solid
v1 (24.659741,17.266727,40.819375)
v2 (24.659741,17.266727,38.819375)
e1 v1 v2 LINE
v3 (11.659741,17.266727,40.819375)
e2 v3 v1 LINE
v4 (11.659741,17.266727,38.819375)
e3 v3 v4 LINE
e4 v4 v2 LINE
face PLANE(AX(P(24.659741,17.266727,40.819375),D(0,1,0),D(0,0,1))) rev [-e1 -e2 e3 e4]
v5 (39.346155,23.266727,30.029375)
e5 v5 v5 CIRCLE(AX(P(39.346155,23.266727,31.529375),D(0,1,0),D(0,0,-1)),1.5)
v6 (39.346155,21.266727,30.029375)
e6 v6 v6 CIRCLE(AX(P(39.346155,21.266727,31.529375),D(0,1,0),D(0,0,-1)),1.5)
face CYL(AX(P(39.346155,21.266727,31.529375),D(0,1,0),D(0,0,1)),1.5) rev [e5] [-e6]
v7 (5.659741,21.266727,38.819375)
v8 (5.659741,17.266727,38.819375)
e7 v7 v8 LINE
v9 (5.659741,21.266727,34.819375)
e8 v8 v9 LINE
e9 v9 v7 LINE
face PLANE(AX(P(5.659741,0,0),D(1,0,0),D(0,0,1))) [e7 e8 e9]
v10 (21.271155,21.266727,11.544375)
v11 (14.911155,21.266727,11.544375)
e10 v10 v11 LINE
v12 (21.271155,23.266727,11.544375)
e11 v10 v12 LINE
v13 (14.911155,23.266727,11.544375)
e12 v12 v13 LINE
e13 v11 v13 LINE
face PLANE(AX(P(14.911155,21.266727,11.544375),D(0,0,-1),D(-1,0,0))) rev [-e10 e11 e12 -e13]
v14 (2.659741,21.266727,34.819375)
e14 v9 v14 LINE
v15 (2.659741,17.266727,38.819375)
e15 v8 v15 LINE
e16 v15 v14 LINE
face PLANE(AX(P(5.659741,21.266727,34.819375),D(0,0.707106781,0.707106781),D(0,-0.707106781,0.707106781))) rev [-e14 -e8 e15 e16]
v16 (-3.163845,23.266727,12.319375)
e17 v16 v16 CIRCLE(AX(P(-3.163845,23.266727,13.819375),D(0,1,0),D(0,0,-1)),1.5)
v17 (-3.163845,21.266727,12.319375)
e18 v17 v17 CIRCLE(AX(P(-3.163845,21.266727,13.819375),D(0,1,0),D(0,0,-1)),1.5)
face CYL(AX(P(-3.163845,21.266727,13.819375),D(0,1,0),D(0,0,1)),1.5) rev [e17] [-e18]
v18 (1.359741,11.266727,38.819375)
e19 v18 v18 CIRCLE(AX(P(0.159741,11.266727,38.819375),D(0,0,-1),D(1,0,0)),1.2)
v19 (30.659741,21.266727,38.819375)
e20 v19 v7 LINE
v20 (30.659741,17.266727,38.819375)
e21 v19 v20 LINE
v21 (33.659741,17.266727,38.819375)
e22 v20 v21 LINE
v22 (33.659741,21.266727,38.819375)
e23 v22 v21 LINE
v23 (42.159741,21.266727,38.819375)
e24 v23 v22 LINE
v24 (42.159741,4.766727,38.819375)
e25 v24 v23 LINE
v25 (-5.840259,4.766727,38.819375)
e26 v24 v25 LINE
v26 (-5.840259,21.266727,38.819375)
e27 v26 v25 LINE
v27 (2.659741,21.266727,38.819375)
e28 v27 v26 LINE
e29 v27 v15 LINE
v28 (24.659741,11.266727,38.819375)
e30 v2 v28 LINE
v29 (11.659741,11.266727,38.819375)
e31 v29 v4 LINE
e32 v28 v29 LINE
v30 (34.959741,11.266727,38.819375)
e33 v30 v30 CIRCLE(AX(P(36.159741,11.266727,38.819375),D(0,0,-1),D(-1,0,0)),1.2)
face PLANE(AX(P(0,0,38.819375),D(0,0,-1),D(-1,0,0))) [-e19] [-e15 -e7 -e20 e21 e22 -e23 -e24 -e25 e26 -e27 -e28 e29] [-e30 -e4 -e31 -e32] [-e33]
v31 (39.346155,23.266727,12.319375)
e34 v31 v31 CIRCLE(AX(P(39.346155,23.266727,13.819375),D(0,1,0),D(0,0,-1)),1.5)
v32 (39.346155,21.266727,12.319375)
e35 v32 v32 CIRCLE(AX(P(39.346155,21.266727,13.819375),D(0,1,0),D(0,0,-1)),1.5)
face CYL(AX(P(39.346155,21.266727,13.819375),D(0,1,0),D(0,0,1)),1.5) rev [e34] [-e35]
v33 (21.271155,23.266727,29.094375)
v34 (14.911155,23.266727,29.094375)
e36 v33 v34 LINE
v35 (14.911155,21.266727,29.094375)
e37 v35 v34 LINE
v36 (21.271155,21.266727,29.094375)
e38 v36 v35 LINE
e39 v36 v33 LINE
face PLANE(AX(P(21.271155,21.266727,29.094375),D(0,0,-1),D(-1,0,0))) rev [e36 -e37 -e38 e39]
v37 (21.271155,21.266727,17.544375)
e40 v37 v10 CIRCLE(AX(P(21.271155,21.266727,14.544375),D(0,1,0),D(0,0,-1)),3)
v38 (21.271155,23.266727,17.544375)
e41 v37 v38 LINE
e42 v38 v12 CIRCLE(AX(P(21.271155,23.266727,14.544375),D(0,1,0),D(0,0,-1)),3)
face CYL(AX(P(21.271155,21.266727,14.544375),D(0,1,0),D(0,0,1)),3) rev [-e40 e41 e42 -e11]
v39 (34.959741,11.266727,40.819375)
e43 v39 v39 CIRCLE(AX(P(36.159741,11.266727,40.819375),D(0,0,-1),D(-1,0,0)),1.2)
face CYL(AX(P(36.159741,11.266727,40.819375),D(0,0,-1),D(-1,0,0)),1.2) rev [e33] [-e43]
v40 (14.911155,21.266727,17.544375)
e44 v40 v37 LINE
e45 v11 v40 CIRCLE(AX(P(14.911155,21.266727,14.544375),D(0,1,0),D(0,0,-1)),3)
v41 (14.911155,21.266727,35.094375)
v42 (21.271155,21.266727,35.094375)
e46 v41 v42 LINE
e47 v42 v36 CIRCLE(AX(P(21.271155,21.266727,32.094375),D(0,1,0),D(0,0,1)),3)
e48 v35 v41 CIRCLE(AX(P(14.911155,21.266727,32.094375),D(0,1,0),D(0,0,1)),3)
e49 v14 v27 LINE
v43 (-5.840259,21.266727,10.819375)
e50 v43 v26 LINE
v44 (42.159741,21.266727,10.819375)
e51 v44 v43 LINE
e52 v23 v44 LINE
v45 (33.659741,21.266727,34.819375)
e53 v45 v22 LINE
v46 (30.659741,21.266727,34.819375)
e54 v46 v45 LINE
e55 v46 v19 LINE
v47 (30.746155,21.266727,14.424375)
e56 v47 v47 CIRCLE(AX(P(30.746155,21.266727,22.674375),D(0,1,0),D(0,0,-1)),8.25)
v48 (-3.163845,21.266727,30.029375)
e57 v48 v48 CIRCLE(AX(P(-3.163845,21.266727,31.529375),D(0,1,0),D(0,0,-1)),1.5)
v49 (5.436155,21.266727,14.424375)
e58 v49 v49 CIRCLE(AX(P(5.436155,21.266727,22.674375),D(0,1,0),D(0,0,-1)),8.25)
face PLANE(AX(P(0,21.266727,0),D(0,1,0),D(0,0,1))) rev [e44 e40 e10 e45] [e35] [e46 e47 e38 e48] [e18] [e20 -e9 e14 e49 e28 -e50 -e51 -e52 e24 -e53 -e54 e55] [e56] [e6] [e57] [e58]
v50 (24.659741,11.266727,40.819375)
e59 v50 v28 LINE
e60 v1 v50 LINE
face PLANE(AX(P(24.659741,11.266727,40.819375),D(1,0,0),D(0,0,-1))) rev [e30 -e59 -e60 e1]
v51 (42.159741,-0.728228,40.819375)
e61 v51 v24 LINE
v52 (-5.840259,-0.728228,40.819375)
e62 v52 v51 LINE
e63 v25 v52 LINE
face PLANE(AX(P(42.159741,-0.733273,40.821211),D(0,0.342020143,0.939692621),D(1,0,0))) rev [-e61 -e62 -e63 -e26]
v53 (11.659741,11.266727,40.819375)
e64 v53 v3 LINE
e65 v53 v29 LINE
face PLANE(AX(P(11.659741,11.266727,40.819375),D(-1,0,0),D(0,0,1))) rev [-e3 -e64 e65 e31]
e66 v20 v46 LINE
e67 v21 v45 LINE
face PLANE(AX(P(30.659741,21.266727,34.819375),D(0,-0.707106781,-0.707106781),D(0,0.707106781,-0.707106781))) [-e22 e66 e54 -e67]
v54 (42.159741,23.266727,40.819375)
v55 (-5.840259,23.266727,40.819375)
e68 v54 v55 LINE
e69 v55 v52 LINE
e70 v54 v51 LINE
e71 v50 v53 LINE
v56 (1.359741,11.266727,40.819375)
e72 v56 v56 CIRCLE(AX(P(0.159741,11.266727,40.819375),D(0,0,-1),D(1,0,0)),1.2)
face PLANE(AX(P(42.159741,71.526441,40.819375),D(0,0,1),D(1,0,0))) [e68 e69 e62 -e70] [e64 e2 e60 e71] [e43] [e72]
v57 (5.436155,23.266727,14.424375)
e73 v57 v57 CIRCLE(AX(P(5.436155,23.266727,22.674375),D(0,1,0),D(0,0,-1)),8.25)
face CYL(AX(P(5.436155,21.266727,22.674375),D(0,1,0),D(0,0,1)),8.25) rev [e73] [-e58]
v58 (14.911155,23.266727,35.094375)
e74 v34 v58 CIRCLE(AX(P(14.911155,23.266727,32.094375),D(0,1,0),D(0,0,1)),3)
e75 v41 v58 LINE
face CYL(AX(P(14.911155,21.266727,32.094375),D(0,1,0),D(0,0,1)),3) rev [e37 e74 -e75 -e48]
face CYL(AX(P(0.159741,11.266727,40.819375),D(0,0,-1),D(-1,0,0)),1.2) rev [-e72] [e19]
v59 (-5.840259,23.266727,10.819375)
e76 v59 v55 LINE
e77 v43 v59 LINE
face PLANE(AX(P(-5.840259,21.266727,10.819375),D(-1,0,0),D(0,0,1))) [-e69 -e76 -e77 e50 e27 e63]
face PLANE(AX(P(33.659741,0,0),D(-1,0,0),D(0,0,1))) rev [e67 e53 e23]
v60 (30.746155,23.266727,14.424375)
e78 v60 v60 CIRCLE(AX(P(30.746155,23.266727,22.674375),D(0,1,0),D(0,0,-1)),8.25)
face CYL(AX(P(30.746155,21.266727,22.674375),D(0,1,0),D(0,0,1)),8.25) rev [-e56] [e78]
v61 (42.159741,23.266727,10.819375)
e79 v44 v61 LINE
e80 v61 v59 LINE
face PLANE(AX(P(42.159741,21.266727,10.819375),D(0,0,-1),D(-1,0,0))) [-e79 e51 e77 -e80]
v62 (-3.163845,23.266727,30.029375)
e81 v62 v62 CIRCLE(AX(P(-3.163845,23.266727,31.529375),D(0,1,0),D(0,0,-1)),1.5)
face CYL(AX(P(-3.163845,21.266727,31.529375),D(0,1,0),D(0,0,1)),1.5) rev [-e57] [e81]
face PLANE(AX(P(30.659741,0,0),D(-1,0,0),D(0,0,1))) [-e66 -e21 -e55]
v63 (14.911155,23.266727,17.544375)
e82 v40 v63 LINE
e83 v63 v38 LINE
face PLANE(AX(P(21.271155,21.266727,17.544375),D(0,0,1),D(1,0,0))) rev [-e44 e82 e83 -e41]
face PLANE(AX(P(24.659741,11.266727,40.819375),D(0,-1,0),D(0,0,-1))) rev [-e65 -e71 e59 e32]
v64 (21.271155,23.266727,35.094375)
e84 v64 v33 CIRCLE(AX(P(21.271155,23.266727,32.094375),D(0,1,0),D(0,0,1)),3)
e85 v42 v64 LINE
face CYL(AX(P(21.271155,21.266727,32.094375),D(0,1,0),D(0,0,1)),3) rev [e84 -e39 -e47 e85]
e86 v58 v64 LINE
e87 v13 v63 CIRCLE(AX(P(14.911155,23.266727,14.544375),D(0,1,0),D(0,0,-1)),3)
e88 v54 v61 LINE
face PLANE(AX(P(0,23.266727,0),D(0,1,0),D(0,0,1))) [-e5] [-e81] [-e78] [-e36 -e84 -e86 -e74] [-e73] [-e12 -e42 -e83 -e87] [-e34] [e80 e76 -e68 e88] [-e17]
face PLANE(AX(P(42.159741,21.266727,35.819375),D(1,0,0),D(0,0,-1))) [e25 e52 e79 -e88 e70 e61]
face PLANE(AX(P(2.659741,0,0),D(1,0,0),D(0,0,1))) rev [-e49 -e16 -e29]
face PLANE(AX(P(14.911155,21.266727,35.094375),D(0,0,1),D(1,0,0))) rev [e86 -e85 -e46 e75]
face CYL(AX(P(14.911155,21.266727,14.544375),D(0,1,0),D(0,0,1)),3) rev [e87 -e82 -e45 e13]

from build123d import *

# Parameters (mm, degrees)
SKIZZE1_W                            = 48
SKIZZE1_H                            = 25
SKIZZE1_R                            = 8.25
SKIZZE1_R_2                          = 1.5
AUFSATZ_LINEAR_AUSTRAGEN1_DEPTH      = 2
SKIZZE2_W                            = 48
SKIZZE2_H                            = 5
AUFSATZ_LINEAR_AUSTRAGEN2_DEPTH      = 2
SKIZZE3_W                            = 48
SKIZZE3_H                            = 22
AUFSATZ_LINEAR_AUSTRAGEN3_DEPTH      = 2
AUFSATZ_LINEAR_AUSTRAGEN4_DEPTH      = 1.5
SCHNITT_LINEAR_AUSTRAGEN1_DEPTH      = 56.702642494
SCHNITT_LINEAR_AUSTRAGEN1_DEPTH_BACK = 56.702642494
SKIZZE6_W                            = 13
SKIZZE6_H                            = 6
SCHNITT_LINEAR_AUSTRAGEN2_DEPTH      = 56.702642494
SCHNITT_LINEAR_AUSTRAGEN2_DEPTH_BACK = 56.702642494
SKIZZE7_R                            = 1.2
FASE1_SIZE                           = 5.5
FASE1_SIZE_2                         = 2.001836288


with BuildPart() as part:
    # Skizze1 → Aufsatz-Linear austragen1 (new body)
    with BuildSketch(Plane(origin=(0, 23.26672716, 0), x_dir=(1, 0, 0), z_dir=(0, 1, 0))):
        with Locations((18.159741318, -23.319374593)):
            Rectangle(SKIZZE1_W, SKIZZE1_H)
        with Locations(Location((5.436155106, -22.674374593, 0), (0, 0, 90))):
            Circle(SKIZZE1_R, mode=Mode.SUBTRACT)
        with Locations(Location((30.746155106, -22.674374593, 0), (0, 0, 90))):
            Circle(SKIZZE1_R, mode=Mode.SUBTRACT)
        with Locations(Location((39.346155106, -31.529374593, 0), (0, 0, 90))):
            Circle(SKIZZE1_R_2, mode=Mode.SUBTRACT)
        with Locations(Location((39.346155106, -13.819374593, 0), (0, 0, 90))):
            Circle(SKIZZE1_R_2, mode=Mode.SUBTRACT)
        with Locations(Location((-3.163844894, -13.819374593, 0), (0, 0, 90))):
            Circle(SKIZZE1_R_2, mode=Mode.SUBTRACT)
        with Locations(Location((-3.163844894, -31.529374593, 0), (0, 0, 90))):
            Circle(SKIZZE1_R_2, mode=Mode.SUBTRACT)
        with BuildLine():
            Line((21.271155106, -29.094374598), (14.911155106, -29.094374598))
            ThreePointArc((14.911155106, -29.094374598), (11.911155106, -32.094374598), (14.911155106, -35.094374598))
            Line((14.911155106, -35.094374598), (21.271155106, -35.094374598))
            ThreePointArc((21.271155106, -35.094374598), (24.271155106, -32.094374598), (21.271155106, -29.094374598))
        make_face(mode=Mode.SUBTRACT)
        with BuildLine():
            Line((14.911155106, -11.544374589), (21.271155106, -11.544374589))
            ThreePointArc((21.271155106, -11.544374589), (24.271155106, -14.544374589), (21.271155106, -17.544374589))
            Line((21.271155106, -17.544374589), (14.911155106, -17.544374589))
            ThreePointArc((14.911155106, -17.544374589), (11.911155106, -14.544374589), (14.911155106, -11.544374589))
        make_face(mode=Mode.SUBTRACT)
    extrude(amount=-AUFSATZ_LINEAR_AUSTRAGEN1_DEPTH)

    # Skizze2 → Aufsatz-Linear austragen2 (add)
    with BuildSketch(Plane(origin=(0, 21.26672716, 0), x_dir=(-1, 0, 0), z_dir=(0, -1, 0))):
        with Locations((-18.159741318, -38.319374593)):
            Rectangle(SKIZZE2_W, SKIZZE2_H)
    extrude(amount=-AUFSATZ_LINEAR_AUSTRAGEN2_DEPTH)

    # Skizze3 → Aufsatz-Linear austragen3 (add)
    with BuildSketch(Plane.XY.offset(40.819374593)):
        with Locations((18.159741318, 10.26672716)):
            Rectangle(SKIZZE3_W, SKIZZE3_H)
    extrude(amount=-AUFSATZ_LINEAR_AUSTRAGEN3_DEPTH)

    # Skizze5 → Aufsatz-Linear austragen4 (add, symmetric)
    with BuildSketch(Plane(origin=(32.159741318, 0, 0), x_dir=(0, 0, -1), z_dir=(1, 0, 0))):
        Polygon((-38.819374593, 17.26672716), (-38.819374593, 21.26672716), (-34.819374593, 21.26672716), align=None)
    aufsatz_linear_austragen4 = extrude(amount=AUFSATZ_LINEAR_AUSTRAGEN4_DEPTH, both=True)

    # Spiegeln1: Aufsatz-Linear austragen4 across plane
    add(aufsatz_linear_austragen4.mirror(Plane(origin=(18.159741318, 0, 0), x_dir=(0, 0, 1), z_dir=(1, 0, 0))))

    # Skizze6 → Schnitt-Linear austragen1 (cut, two sides: drawn at the far end of the back side and taken through both)
    with BuildSketch(Plane(origin=(0, 0, 38.819374593), x_dir=(-1, 0, 0), z_dir=(0, 0, -1)).offset(-SCHNITT_LINEAR_AUSTRAGEN1_DEPTH_BACK)):
        with Locations((-18.159741318, 14.26672716)):
            Rectangle(SKIZZE6_W, SKIZZE6_H)
    extrude(amount=SCHNITT_LINEAR_AUSTRAGEN1_DEPTH + SCHNITT_LINEAR_AUSTRAGEN1_DEPTH_BACK, mode=Mode.SUBTRACT)

    # Skizze7 → Schnitt-Linear austragen2 (cut, two sides: drawn at the far end of the back side and taken through both)
    with BuildSketch(Plane(origin=(0, 0, 38.819374593), x_dir=(-1, 0, 0), z_dir=(0, 0, -1)).offset(-SCHNITT_LINEAR_AUSTRAGEN2_DEPTH_BACK)):
        with Locations((-36.159741318, 11.26672716)):
            Circle(SKIZZE7_R)
        with Locations(Location((-0.159741318, 11.26672716, 0), (0, 0, 180))):
            Circle(SKIZZE7_R)
    extrude(amount=SCHNITT_LINEAR_AUSTRAGEN2_DEPTH + SCHNITT_LINEAR_AUSTRAGEN2_DEPTH_BACK, mode=Mode.SUBTRACT)

    # Fase1
    # the kernel refuses this chamfer: 5.5, 2.001836288 mm, written as the material it takes off along each edge
    with BuildSketch(Plane(origin=(-20.108329711, -0.73327284, 38.819374593), x_dir=(0, 0.9999130865277315, -0.013184058198645307), z_dir=(1, 0, 0))) as fase1_piece_1:
        Polygon((FASE1_SIZE * 0.999913086528, FASE1_SIZE * 0.0131840581986), (-FASE1_SIZE_2 * 0.0131840582017, FASE1_SIZE_2 * 0.99991308676), (0, 0), align=None)
    extrude(amount=76.536142058, mode=Mode.SUBTRACT)


solid = part.part
